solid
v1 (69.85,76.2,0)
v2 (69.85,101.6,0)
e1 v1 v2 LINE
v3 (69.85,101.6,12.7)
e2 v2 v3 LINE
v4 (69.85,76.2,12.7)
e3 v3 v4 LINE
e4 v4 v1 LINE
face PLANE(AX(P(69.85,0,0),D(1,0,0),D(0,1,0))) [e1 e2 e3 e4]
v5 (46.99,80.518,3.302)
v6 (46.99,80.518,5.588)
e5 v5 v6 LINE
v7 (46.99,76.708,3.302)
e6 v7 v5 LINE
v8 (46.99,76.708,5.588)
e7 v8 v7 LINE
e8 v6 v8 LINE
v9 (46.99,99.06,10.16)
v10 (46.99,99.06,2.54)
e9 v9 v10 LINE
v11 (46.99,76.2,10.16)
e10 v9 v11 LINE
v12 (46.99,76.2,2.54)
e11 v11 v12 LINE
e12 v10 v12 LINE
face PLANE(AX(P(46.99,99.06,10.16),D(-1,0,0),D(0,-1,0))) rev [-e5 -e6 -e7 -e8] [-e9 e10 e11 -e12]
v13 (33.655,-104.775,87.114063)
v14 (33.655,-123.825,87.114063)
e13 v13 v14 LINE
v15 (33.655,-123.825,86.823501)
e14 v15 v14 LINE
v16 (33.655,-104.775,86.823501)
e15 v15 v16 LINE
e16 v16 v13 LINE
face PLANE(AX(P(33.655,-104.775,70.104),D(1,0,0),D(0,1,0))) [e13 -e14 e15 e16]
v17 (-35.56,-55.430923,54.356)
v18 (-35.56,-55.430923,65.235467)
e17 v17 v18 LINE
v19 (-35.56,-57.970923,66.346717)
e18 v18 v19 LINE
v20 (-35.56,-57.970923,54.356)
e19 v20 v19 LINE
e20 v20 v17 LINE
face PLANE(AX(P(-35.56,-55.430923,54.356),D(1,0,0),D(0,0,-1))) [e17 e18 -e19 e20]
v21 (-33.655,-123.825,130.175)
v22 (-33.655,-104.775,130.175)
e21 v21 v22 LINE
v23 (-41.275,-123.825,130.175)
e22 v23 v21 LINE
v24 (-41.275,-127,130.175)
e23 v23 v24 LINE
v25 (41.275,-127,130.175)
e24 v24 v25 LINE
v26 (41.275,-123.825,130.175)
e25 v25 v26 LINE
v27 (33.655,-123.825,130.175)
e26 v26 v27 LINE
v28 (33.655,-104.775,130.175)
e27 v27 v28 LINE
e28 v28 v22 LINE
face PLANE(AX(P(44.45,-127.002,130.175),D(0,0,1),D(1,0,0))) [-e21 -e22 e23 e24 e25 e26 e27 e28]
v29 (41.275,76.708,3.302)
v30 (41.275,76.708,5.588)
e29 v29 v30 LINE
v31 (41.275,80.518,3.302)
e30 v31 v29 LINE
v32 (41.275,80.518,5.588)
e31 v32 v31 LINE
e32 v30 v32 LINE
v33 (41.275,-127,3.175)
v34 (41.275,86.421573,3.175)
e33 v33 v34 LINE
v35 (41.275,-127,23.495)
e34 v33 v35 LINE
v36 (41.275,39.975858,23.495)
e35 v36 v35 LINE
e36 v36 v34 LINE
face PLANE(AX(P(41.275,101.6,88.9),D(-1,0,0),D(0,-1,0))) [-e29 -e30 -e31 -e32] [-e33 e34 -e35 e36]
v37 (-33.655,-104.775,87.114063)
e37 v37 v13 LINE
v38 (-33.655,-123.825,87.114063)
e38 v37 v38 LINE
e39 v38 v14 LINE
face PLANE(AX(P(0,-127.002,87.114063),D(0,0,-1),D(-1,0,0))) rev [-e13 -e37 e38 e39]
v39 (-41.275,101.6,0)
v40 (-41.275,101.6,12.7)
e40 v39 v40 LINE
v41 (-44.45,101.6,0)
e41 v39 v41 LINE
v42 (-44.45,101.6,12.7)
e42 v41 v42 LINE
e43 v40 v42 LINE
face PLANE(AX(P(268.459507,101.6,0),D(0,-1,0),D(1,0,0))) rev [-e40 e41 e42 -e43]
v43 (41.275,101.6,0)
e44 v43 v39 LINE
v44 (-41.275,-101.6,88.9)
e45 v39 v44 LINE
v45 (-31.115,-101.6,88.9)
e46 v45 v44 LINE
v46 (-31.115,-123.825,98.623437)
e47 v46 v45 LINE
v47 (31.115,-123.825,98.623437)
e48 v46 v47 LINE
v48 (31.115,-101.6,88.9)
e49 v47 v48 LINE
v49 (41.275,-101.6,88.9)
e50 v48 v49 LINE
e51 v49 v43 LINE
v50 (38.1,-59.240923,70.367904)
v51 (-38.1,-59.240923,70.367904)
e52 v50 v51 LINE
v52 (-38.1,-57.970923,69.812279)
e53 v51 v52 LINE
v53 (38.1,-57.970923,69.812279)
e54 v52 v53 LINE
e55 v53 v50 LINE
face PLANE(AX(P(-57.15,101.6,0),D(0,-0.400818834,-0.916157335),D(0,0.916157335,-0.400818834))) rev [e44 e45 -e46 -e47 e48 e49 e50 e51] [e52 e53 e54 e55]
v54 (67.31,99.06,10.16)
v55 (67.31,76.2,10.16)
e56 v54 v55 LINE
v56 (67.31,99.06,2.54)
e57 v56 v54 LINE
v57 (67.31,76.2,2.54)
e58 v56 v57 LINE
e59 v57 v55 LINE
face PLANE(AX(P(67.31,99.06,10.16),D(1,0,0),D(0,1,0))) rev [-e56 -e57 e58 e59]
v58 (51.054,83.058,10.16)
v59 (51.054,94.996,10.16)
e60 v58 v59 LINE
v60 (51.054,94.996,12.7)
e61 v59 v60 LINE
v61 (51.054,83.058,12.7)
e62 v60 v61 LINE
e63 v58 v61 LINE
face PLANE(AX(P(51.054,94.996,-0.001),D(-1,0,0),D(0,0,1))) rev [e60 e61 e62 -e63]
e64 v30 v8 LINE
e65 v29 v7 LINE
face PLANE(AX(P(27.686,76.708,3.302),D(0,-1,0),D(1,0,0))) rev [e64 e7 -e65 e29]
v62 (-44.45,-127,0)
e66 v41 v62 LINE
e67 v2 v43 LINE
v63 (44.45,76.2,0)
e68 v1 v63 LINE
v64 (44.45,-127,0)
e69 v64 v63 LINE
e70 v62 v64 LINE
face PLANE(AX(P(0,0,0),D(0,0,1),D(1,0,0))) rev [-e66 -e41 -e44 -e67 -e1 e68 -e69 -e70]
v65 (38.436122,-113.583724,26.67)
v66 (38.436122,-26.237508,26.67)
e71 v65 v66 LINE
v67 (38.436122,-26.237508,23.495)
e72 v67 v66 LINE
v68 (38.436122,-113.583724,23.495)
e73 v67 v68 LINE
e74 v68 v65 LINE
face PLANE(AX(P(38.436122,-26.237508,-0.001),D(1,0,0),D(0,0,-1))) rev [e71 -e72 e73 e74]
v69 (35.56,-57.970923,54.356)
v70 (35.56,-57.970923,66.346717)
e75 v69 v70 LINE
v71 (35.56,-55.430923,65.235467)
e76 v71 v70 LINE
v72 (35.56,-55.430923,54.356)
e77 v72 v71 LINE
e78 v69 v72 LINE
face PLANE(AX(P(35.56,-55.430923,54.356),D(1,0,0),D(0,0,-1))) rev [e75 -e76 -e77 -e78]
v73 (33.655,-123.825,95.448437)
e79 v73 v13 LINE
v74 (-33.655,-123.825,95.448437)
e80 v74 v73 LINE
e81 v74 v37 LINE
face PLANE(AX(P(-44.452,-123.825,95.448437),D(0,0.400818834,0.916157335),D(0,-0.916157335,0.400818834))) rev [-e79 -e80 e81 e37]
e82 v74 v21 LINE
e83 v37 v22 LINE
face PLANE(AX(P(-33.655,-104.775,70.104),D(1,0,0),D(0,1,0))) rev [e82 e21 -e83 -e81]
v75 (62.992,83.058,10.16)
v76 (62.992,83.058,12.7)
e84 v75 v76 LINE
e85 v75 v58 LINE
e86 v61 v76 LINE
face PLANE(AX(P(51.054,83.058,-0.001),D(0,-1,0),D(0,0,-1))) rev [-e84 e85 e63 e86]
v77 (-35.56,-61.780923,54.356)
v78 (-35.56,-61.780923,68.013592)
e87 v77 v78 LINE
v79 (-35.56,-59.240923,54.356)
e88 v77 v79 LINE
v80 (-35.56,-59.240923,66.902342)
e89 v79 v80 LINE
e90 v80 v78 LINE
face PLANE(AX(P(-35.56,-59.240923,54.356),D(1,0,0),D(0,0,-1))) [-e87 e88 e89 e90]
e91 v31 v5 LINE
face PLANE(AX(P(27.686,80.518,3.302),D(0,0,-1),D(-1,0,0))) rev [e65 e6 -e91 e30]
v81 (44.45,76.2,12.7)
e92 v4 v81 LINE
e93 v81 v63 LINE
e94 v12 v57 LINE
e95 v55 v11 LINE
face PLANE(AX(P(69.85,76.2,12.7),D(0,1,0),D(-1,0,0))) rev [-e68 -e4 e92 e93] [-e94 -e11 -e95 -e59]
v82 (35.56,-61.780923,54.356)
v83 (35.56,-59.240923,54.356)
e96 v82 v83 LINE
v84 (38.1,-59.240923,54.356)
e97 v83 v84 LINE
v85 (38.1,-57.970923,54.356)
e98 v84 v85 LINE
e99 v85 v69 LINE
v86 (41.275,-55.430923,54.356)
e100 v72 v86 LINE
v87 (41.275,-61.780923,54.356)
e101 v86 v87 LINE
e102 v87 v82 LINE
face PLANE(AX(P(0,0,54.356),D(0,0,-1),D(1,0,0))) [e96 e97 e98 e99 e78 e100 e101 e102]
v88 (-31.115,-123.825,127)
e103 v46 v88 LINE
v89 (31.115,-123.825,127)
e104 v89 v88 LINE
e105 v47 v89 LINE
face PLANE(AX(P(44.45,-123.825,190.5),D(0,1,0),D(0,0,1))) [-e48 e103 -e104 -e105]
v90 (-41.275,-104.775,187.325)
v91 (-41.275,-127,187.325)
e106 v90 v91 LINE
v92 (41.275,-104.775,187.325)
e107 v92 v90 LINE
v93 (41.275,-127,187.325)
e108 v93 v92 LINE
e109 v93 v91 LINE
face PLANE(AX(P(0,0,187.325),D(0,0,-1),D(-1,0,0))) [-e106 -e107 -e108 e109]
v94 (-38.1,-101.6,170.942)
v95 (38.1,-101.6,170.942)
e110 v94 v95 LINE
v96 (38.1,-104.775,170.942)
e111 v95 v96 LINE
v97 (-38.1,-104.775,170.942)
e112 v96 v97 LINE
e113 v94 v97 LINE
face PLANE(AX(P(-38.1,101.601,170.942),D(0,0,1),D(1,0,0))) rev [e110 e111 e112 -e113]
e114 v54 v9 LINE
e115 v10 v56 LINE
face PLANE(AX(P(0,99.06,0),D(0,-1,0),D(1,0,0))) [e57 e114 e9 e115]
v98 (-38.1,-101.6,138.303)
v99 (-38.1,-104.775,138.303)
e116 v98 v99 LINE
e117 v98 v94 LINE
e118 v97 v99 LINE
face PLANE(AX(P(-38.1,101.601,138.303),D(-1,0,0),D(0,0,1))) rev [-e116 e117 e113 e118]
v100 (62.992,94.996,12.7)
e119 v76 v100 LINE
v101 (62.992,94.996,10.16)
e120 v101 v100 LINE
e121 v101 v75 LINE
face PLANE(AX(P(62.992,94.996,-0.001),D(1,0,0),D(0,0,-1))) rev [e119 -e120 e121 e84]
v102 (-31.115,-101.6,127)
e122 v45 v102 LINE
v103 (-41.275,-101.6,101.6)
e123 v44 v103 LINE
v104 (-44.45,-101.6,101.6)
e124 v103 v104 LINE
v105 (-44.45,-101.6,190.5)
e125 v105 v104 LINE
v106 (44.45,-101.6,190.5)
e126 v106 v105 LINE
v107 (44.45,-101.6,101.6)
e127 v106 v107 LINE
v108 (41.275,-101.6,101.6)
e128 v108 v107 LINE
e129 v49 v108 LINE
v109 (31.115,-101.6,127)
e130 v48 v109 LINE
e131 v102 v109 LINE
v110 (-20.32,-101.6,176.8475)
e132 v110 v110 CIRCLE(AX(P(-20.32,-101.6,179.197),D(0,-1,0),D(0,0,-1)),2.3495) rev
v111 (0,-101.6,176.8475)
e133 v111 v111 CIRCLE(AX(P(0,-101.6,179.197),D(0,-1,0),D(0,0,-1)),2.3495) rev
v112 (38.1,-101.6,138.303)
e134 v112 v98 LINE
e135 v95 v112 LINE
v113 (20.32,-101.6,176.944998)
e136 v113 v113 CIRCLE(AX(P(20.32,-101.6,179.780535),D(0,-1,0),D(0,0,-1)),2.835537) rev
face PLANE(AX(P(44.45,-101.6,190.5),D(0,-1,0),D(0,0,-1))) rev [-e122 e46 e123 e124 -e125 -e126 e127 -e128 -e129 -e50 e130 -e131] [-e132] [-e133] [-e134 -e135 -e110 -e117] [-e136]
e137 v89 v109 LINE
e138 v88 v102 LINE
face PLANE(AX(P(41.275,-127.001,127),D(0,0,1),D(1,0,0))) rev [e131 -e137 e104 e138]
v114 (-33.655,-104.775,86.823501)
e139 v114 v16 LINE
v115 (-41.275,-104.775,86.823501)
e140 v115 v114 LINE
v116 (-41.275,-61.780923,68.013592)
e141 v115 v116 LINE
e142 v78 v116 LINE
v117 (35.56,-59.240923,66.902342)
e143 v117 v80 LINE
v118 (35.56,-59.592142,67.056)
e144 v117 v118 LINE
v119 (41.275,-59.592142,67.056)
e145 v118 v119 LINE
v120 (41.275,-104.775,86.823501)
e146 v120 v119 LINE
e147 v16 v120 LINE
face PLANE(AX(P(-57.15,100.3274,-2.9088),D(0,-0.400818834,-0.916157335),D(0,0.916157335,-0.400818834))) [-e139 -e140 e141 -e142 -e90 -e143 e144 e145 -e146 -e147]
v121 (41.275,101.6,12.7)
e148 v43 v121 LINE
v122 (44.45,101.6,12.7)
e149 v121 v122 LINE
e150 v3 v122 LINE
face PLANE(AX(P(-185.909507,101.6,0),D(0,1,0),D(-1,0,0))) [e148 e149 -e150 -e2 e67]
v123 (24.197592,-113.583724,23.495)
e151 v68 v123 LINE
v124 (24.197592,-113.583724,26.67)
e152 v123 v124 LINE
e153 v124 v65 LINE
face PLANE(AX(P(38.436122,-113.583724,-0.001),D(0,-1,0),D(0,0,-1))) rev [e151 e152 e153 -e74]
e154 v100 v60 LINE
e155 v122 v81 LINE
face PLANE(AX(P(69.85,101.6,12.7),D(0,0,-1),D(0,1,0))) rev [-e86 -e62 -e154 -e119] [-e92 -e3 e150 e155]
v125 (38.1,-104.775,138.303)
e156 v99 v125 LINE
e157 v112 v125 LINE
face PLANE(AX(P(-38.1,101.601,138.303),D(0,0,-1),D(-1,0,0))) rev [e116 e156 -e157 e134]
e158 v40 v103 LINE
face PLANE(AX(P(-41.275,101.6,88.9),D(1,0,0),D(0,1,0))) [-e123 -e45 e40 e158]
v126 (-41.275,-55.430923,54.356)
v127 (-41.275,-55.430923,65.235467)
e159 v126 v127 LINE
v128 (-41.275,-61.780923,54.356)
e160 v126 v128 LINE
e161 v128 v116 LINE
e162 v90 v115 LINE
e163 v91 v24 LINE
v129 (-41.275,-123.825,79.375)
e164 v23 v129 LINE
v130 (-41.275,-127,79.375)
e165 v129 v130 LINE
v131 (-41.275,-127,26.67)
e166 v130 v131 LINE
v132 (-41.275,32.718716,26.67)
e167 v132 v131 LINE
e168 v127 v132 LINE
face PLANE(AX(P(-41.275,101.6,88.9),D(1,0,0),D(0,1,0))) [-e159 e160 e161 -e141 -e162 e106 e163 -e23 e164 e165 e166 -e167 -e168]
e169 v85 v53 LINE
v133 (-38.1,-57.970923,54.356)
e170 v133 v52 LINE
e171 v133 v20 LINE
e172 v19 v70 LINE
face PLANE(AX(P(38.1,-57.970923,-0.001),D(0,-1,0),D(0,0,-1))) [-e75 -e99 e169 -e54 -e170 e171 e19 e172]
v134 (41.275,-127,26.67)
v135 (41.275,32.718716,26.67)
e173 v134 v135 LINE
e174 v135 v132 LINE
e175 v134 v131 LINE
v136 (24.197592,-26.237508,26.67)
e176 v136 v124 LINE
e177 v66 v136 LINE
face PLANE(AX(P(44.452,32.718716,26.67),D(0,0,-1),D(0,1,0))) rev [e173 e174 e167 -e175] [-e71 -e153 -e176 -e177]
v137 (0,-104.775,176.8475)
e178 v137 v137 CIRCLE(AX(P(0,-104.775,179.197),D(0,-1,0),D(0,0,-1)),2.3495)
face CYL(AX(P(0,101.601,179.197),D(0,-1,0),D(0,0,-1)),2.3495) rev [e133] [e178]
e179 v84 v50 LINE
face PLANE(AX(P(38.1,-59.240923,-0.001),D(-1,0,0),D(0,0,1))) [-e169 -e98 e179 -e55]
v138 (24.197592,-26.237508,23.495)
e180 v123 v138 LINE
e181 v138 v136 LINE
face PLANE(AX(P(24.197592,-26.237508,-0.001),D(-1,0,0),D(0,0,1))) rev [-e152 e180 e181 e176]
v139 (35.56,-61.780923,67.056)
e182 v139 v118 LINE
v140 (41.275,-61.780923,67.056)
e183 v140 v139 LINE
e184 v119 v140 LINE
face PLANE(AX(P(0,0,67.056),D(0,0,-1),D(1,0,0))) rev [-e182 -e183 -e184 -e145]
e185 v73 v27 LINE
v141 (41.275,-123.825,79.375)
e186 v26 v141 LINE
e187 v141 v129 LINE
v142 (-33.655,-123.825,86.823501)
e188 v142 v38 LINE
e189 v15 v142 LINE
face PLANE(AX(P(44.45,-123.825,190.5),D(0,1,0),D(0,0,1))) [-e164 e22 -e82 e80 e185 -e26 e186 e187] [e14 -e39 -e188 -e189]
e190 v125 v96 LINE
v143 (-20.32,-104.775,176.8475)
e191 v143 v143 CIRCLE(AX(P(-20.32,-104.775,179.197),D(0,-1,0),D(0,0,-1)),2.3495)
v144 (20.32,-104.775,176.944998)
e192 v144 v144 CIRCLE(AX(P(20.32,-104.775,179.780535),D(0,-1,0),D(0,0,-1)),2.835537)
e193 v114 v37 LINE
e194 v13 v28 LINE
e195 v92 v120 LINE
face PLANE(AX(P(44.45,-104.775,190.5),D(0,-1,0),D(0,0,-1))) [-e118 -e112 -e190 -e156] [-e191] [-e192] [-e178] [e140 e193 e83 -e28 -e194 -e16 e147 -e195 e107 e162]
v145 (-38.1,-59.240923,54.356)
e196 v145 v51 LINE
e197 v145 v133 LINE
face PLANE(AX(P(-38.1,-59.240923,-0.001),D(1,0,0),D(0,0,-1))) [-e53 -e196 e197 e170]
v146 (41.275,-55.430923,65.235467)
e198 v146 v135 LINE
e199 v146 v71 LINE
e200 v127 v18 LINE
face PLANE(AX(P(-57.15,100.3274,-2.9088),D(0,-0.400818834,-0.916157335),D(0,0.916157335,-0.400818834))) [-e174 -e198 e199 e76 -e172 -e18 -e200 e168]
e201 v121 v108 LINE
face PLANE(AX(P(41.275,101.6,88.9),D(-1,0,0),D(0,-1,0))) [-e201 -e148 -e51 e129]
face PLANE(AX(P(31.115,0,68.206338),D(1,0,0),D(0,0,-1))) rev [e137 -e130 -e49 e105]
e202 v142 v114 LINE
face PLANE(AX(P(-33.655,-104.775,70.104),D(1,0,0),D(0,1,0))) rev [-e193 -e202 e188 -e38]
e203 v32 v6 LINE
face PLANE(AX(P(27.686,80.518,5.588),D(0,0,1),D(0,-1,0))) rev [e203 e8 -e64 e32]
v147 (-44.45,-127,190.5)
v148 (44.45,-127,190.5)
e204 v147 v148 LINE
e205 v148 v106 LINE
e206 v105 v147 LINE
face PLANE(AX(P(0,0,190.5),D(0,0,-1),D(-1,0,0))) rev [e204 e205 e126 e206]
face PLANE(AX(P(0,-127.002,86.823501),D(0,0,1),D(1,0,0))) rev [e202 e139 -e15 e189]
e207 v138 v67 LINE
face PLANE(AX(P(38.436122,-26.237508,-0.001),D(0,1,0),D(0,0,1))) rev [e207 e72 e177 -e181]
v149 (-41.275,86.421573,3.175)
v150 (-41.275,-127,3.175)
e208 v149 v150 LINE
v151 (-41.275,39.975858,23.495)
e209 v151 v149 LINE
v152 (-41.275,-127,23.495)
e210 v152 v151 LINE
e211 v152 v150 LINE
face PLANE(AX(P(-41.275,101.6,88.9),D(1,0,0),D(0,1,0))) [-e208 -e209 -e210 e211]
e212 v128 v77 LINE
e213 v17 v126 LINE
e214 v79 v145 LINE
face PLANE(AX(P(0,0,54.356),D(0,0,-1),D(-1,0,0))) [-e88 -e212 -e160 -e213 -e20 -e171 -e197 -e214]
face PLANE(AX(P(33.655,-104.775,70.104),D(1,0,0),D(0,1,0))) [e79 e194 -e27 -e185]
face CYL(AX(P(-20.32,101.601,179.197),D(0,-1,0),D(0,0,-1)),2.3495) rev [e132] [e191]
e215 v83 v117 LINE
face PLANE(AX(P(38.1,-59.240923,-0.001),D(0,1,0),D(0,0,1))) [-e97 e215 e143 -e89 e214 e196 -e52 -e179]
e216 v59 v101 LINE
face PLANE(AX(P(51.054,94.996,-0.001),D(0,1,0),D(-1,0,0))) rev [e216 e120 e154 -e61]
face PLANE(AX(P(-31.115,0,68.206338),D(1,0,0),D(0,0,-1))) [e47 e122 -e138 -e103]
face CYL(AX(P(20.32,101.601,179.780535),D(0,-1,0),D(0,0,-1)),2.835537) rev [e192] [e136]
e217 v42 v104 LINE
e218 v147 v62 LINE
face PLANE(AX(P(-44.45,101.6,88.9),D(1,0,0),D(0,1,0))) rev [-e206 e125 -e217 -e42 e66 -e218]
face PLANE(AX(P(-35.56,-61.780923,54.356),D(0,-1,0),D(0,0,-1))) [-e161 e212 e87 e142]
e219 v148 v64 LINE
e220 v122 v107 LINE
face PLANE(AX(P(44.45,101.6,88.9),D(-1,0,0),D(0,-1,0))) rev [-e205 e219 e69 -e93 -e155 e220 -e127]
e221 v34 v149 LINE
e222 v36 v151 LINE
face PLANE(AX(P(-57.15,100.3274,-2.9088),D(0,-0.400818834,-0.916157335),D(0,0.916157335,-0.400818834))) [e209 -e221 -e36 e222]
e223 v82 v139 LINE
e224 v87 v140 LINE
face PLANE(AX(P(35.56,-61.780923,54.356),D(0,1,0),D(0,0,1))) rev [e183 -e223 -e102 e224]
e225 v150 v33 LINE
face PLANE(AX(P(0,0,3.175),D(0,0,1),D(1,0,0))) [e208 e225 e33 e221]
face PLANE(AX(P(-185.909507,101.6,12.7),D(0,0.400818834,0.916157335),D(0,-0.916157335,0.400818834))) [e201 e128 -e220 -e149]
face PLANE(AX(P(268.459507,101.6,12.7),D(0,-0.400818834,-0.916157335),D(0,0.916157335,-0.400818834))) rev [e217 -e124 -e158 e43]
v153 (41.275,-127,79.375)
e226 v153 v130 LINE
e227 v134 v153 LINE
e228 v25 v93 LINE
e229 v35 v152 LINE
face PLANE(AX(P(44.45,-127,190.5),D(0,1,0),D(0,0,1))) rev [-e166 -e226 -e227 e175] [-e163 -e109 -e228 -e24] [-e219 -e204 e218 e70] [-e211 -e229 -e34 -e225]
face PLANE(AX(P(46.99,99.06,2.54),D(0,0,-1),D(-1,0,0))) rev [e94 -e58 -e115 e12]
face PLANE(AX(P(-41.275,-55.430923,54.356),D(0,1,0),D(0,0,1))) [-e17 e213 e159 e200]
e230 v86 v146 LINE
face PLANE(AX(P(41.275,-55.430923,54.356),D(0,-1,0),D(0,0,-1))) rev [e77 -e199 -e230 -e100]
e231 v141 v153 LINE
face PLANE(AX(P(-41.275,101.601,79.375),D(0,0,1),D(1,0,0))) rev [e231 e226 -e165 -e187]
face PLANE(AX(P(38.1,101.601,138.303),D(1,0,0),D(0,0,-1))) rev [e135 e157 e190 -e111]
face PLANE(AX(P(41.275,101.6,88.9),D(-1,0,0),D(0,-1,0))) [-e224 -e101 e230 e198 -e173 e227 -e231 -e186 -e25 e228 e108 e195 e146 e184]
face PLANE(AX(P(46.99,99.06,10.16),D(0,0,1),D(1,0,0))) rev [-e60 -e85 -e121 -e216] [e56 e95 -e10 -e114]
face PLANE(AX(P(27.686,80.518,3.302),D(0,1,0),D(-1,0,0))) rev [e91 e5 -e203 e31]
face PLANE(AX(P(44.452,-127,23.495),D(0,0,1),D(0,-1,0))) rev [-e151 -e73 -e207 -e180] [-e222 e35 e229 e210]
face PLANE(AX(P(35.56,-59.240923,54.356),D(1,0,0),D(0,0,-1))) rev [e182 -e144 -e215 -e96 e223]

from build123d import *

# Parameters (mm, degrees)
SKETCH3_W                       = 88.9
SKETCH3_H                       = 203.2
BOSS_EXTRUDE2_DEPTH             = 88.9
CUT_EXTRUDE1_DEPTH              = 101.6
SHELL2_T                        = -3.175
SKETCH5_W                       = 88.9
SKETCH5_H                       = 25.4
BOSS_EXTRUDE3_DEPTH             = 190.5
SHELL4_START                    = -41.275
SHELL4_DEPTH                    = 82.55
CUT_EXTRUDE2_REACH              = 284.057
SKETCH7_W                       = 82.55
SKETCH7_H                       = 38.1
BOSS_EXTRUDE4_REACH             = 246.475
BOSS_EXTRUDE5_REACH             = 284.057
SKETCH10_W                      = 88.9
SKETCH10_H                      = 3.175
CUT_EXTRUDE7_REACH              = 302.872
SKETCH13_W                      = 82.55
SKETCH13_H                      = 57.15
BOSS_EXTRUDE6_START             = -3.175
BOSS_EXTRUDE6_DEPTH             = 3.175
BOSS_EXTRUDE7_REACH             = 284.057
SKETCH16_W                      = 82.55
SKETCH16_H                      = 3.175
CUT_EXTRUDE8_REACH              = 302.872
SKETCH17_W                      = 82.55
SKETCH17_H                      = 76.2
BOSS_EXTRUDE8_REACH             = 286.353
SKETCH18_W                      = 82.548541704
SKETCH18_H                      = 0.29056195
BOSS_EXTRUDE9_REACH             = 246.475
CUT_EXTRUDE9_REACH              = 173.426
SKETCH23_W                      = 76.2
SKETCH23_H                      = 1.27
BOSS_EXTRUDE10_DEPTH            = 12.7
BOSS_EXTRUDE11_REACH            = 184.601
SKETCH25_W                      = 5.715
SKETCH25_H                      = 2.188780981
SKETCH26_W                      = 12.7
SKETCH26_H                      = 25.4
BOSS_EXTRUDE12_DEPTH            = 25.4
SKETCH27_W                      = 20.32
SKETCH27_H                      = 7.62
CUT_EXTRUDE10_DEPTH             = 22.86
SKETCH29_W                      = 2.286
SKETCH29_H                      = 3.81
CUT_EXTRUDE12_DEPTH             = 19.304
CUT_EXTRUDE13_REACH             = 231.392
SKETCH30_W                      = 11.938
SKETCH30_H                      = 11.938
CUT_EXTRUDE14_REACH             = 220.743
SKETCH31_W                      = 14.238530822
SKETCH31_H                      = 87.346215886
CUT_EXTRUDE16_REACH             = 194.71
SKETCH32_W                      = 7.62
SKETCH32_H                      = 19.05
CUT_EXTRUDE16_DIRECTION_2_DEPTH = 56.896
BOSS_EXTRUDE13_REACH            = 194.71
CUT_EXTRUDE17_REACH             = 291.413
SKETCH34_W                      = 76.2
SKETCH34_H                      = 32.639
CUT_EXTRUDE18_REACH             = 291.413
SKETCH35_R                      = 2.3495
SKETCH35_R_2                    = 2.83553705


# Read off the part's stored shape, not the designer's step: Shell4
with BuildPart() as part:
    # Sketch3 → Boss-Extrude2 (new body)
    with BuildSketch(Plane.XY):
        Rectangle(SKETCH3_W, SKETCH3_H)
    extrude(amount=BOSS_EXTRUDE2_DEPTH)

    # Sketch4 → Cut-Extrude1 (cut)
    with BuildSketch(Plane(origin=(44.45, 0, 0), x_dir=(0, 0, -1), z_dir=(1, 0, 0))):
        Polygon((0, 101.6), (-88.9, -101.6), (-88.9, 101.6), align=None)
    extrude(amount=-CUT_EXTRUDE1_DEPTH, mode=Mode.SUBTRACT)

    # Shell2
    shell2_openings = [part.faces().sort_by_distance(p)[0] for p in [
        (0, 0, 0),
        (0, -101.6, 44.45),
    ]]
    offset(amount=SHELL2_T, openings=shell2_openings, kind=Kind.INTERSECTION)

    # Sketch5 → Boss-Extrude3 (add)
    with BuildSketch(Plane.XY):
        with Locations((0, -114.3)):
            Rectangle(SKETCH5_W, SKETCH5_H)
    extrude(amount=BOSS_EXTRUDE3_DEPTH)

    # Shell4 outline → Shell4 (cut)
    with BuildSketch(Plane.YZ.offset(SHELL4_START)):
        Polygon((-123.825, 3.175), (-101.6, 3.175), (-101.6, 85.43443805), (-104.775, 86.82350055), (-104.775, 187.325), (-123.825, 187.325), align=None)
    extrude(amount=SHELL4_DEPTH, mode=Mode.SUBTRACT)

    # Sketch7 → Cut-Extrude2 (cut, up to next)
    with BuildSketch(Plane(origin=(0, -101.6, 0), x_dir=(1, 0, 0), z_dir=(0, 1, 0)), mode=Mode.PRIVATE) as cut_extrude2_sk1:
        with Locations((0, -107.95)):
            Rectangle(SKETCH7_W, SKETCH7_H)
    cut_extrude2_tool1 = extrude(cut_extrude2_sk1.sketch, amount=-CUT_EXTRUDE2_REACH, mode=Mode.PRIVATE) & part.part
    add(cut_extrude2_tool1.solids().sort_by_distance((0, -101.6, 107.95))[0], mode=Mode.SUBTRACT)

    # Sketch9 → Boss-Extrude4 (add, up to next)
    with BuildSketch(Plane.ZY.offset(-41.275), mode=Mode.PRIVATE) as boss_extrude4_sk1:
        Polygon((88.9, -101.6), (98.6234375, -123.825), (95.4484375, -123.825), (85.725, -101.6), align=None)
    boss_extrude4_tool1 = extrude(boss_extrude4_sk1.sketch, amount=BOSS_EXTRUDE4_REACH, mode=Mode.PRIVATE) - part.part
    add(boss_extrude4_tool1.solids().sort_by_distance((41.275, -112.7125, 92.174219))[0])

    # Sketch10 → Boss-Extrude5 (add, up to next)
    with BuildSketch(Plane(origin=(0, -101.6, 0), x_dir=(1, 0, 0), z_dir=(0, 1, 0)), mode=Mode.PRIVATE) as boss_extrude5_sk1:
        with Locations((0, -128.5875)):
            Rectangle(SKETCH10_W, SKETCH10_H)
    boss_extrude5_tool1 = extrude(boss_extrude5_sk1.sketch, amount=-BOSS_EXTRUDE5_REACH, mode=Mode.PRIVATE) - part.part
    add(boss_extrude5_tool1.solids().sort_by_distance((0, -101.6, 128.5875))[0])

    # Sketch13 → Cut-Extrude7 (cut, up to next)
    with BuildSketch(Plane.XZ.offset(127), mode=Mode.PRIVATE) as cut_extrude7_sk1:
        with Locations((0, 158.75)):
            Rectangle(SKETCH13_W, SKETCH13_H)
    cut_extrude7_tool1 = extrude(cut_extrude7_sk1.sketch, amount=-CUT_EXTRUDE7_REACH, mode=Mode.PRIVATE) & part.part
    add(cut_extrude7_tool1.solids().sort_by_distance((0, -127, 158.75))[0], mode=Mode.SUBTRACT)

    # Sketch14 → Boss-Extrude6 (add)
    with BuildSketch(Plane(origin=(44.45, 0, 0), x_dir=(0, 0, -1), z_dir=(1, 0, 0)).offset(BOSS_EXTRUDE6_START)):
        Polygon((0, 101.6), (-12.7, 101.6), (-101.6, -101.6), (-88.9, -101.6), align=None)
    boss_extrude6 = extrude(amount=BOSS_EXTRUDE6_DEPTH)

    # Mirror1: Boss-Extrude6 across plane
    add(boss_extrude6.mirror(Plane(origin=(0, 0, 0), x_dir=(0, 0, 1), z_dir=(1, 0, 0))))

    # Sketch16 → Boss-Extrude7 (add, up to next)
    with BuildSketch(Plane(origin=(0, -101.6, 0), x_dir=(1, 0, 0), z_dir=(0, 1, 0)), mode=Mode.PRIVATE) as boss_extrude7_sk1:
        with Locations((0, -1.5875)):
            Rectangle(SKETCH16_W, SKETCH16_H)
    boss_extrude7_tool1 = extrude(boss_extrude7_sk1.sketch, amount=BOSS_EXTRUDE7_REACH, mode=Mode.PRIVATE) - part.part
    add(boss_extrude7_tool1.solids().sort_by_distance((0, -101.6, 1.5875))[0])

    # Sketch17 → Cut-Extrude8 (cut, up to next)
    with BuildSketch(Plane.XZ.offset(127), mode=Mode.PRIVATE) as cut_extrude8_sk1:
        with Locations((0, 41.275)):
            Rectangle(SKETCH17_W, SKETCH17_H)
    cut_extrude8_tool1 = extrude(cut_extrude8_sk1.sketch, amount=-CUT_EXTRUDE8_REACH, mode=Mode.PRIVATE) & part.part
    add(cut_extrude8_tool1.solids().sort_by_distance((0, -127, 41.275))[0], mode=Mode.SUBTRACT)

    # Sketch18 → Boss-Extrude8 (add, up to next)
    with BuildSketch(Plane.XZ.offset(104.775), mode=Mode.PRIVATE) as boss_extrude8_sk1:
        with Locations((-0.000729148, 86.968781525)):
            Rectangle(SKETCH18_W, SKETCH18_H)
    boss_extrude8_tool1 = extrude(boss_extrude8_sk1.sketch, amount=BOSS_EXTRUDE8_REACH, mode=Mode.PRIVATE) - part.part
    add(boss_extrude8_tool1.solids().sort_by_distance((-0.000729, -104.775, 86.968782))[0])

    # Sketch19 → Boss-Extrude9 (add, up to next)
    with BuildSketch(Plane(origin=(-41.275, 0, 0), x_dir=(0, 0, -1), z_dir=(1, 0, 0)), mode=Mode.PRIVATE) as boss_extrude9_sk1:
        Polygon((-26.67, -127), (-23.495, -127), (-23.495, 39.9758584), (-26.67, 32.718715543), align=None)
    boss_extrude9_tool1 = extrude(boss_extrude9_sk1.sketch, amount=BOSS_EXTRUDE9_REACH, mode=Mode.PRIVATE) - part.part
    add(boss_extrude9_tool1.solids().sort_by_distance((-41.275, -45.312922, 25.070745))[0])

    # Cut-Extrude9: up to this plane
    cut_extrude9_end = Plane(origin=(-57.15, 100.327400202, -2.908799538), z_dir=(0, -0.40081883401970775, -0.9161573349021892))
    # Sketch23 → Cut-Extrude9 (cut, up to the surface)
    with BuildSketch(Plane(origin=(0, 0, 84.28350055), x_dir=(-1, 0, 0), z_dir=(0, 0, -1)), mode=Mode.PRIVATE) as cut_extrude9_sk1:
        with Locations((0, -58.605922581)):
            Rectangle(SKETCH23_W, SKETCH23_H)
    cut_extrude9_tool1 = split(extrude(cut_extrude9_sk1.sketch, amount=CUT_EXTRUDE9_REACH, mode=Mode.PRIVATE), bisect_by=cut_extrude9_end, keep=Keep.BOTH, mode=Mode.PRIVATE)
    add(cut_extrude9_tool1.solids().sort_by_distance((0, -58.605923, 84.283501))[0], mode=Mode.SUBTRACT)

    # Sketch24 → Boss-Extrude10 (add)
    with BuildSketch(Plane.XY.offset(67.056)):
        Polygon((-35.56, -59.240922581), (-35.56, -61.780922581), (-41.275, -61.780922581), (-41.275, -55.430922581), (-35.56, -55.430922581), (-35.56, -57.970922581), (-38.1, -57.970922581), (-38.1, -59.240922581), align=None)
    boss_extrude10 = extrude(amount=-BOSS_EXTRUDE10_DEPTH)

    # Sketch25 → Boss-Extrude11 (add, up to next)
    with BuildSketch(Plane.XY.offset(67.056), mode=Mode.PRIVATE) as boss_extrude11_sk1:
        with Locations((-38.4175, -60.686532091)):
            Rectangle(SKETCH25_W, SKETCH25_H)
    boss_extrude11_tool1 = extrude(boss_extrude11_sk1.sketch, amount=BOSS_EXTRUDE11_REACH, mode=Mode.PRIVATE) - part.part
    add(boss_extrude11_tool1.solids().sort_by_distance((-38.4175, -60.686532, 67.056))[0])

    # Mirror2: Boss-Extrude10 across plane
    add(boss_extrude10.mirror(Plane(origin=(0, 0, 0), x_dir=(0, 0, 1), z_dir=(1, 0, 0))))

    # Sketch26 → Boss-Extrude12 (add)
    with BuildSketch(Plane(origin=(44.45, 0, 0), x_dir=(0, 0, -1), z_dir=(1, 0, 0))):
        with Locations((-6.35, 88.9)):
            Rectangle(SKETCH26_W, SKETCH26_H)
    extrude(amount=BOSS_EXTRUDE12_DEPTH)

    # Sketch27 → Cut-Extrude10 (cut)
    with BuildSketch(Plane.XZ.offset(-76.2)):
        with Locations((57.15, 6.35)):
            Rectangle(SKETCH27_W, SKETCH27_H)
    extrude(amount=-CUT_EXTRUDE10_DEPTH, mode=Mode.SUBTRACT)

    # Sketch29 → Cut-Extrude12 (cut)
    with BuildSketch(Plane(origin=(46.99, 0, 0), x_dir=(0, 0, -1), z_dir=(1, 0, 0))):
        with Locations((-4.445, 78.613)):
            Rectangle(SKETCH29_W, SKETCH29_H)
    extrude(amount=-CUT_EXTRUDE12_DEPTH, mode=Mode.SUBTRACT)

    # Sketch30 → Cut-Extrude13 (cut, up to next)
    with BuildSketch(Plane.XY.offset(12.7), mode=Mode.PRIVATE) as cut_extrude13_sk1:
        with Locations((57.023, 89.027)):
            Rectangle(SKETCH30_W, SKETCH30_H)
    cut_extrude13_tool1 = extrude(cut_extrude13_sk1.sketch, amount=-CUT_EXTRUDE13_REACH, mode=Mode.PRIVATE) & part.part
    add(cut_extrude13_tool1.solids().sort_by_distance((57.023, 89.027, 12.7))[0], mode=Mode.SUBTRACT)

    # Sketch31 → Cut-Extrude14 (cut, up to next)
    with BuildSketch(Plane.XY.offset(26.67), mode=Mode.PRIVATE) as cut_extrude14_sk1:
        with Locations((31.316857017, -69.910616217)):
            Rectangle(SKETCH31_W, SKETCH31_H)
    cut_extrude14_tool1 = extrude(cut_extrude14_sk1.sketch, amount=-CUT_EXTRUDE14_REACH, mode=Mode.PRIVATE) & part.part
    add(cut_extrude14_tool1.solids().sort_by_distance((31.316857, -69.910616, 26.67))[0], mode=Mode.SUBTRACT)

    # Sketch32 → Cut-Extrude16 (cut, up to next)
    with BuildSketch(Plane(origin=(0, 0, 127), x_dir=(-1, 0, 0), z_dir=(0, 0, -1)), mode=Mode.PRIVATE) as cut_extrude16_sk1:
        with Locations((-37.465, -114.3)):
            Rectangle(SKETCH32_W, SKETCH32_H)
    cut_extrude16_tool1 = extrude(cut_extrude16_sk1.sketch, amount=-CUT_EXTRUDE16_REACH, mode=Mode.PRIVATE) & part.part
    cut_extrude16 = cut_extrude16_tool1.solids().sort_by_distance((37.465, -114.3, 127))[0]
    add(cut_extrude16, mode=Mode.SUBTRACT)

    # Sketch32 → Cut-Extrude16 direction 2 (cut)
    with BuildSketch(Plane(origin=(0, 0, 127), x_dir=(-1, 0, 0), z_dir=(0, 0, -1))):
        with Locations((-37.465, -114.3)):
            Rectangle(SKETCH32_W, SKETCH32_H)
    cut_extrude16_direction_2 = extrude(amount=CUT_EXTRUDE16_DIRECTION_2_DEPTH, mode=Mode.SUBTRACT)

    # Mirror5: Cut-Extrude16, Cut-Extrude16 direction 2 across plane
    add(cut_extrude16.mirror(Plane(origin=(0, 0, 0), x_dir=(0, 0, 1), z_dir=(1, 0, 0))), mode=Mode.SUBTRACT)
    add(cut_extrude16_direction_2.mirror(Plane(origin=(0, 0, 0), x_dir=(0, 0, 1), z_dir=(1, 0, 0))), mode=Mode.SUBTRACT)

    # Boss-Extrude13: up to this plane
    boss_extrude13_end = Plane(origin=(-57.15, 101.6, 0), z_dir=(0, -0.40081883401970775, -0.9161573349021892))
    # Sketch33 → Boss-Extrude13 (add, up to the surface)
    with BuildSketch(Plane(origin=(0, 0, 127), x_dir=(-1, 0, 0), z_dir=(0, 0, -1)), mode=Mode.PRIVATE) as boss_extrude13_sk1:
        Polygon((-31.115, -101.6), (-41.275, -101.6), (-41.275, -104.775), (-33.655, -104.775), (-33.655, -123.825), (-31.115, -123.825), align=None)
    boss_extrude13_tool1 = split(extrude(boss_extrude13_sk1.sketch, amount=BOSS_EXTRUDE13_REACH, mode=Mode.PRIVATE), bisect_by=boss_extrude13_end, keep=Keep.BOTH, mode=Mode.PRIVATE)
    boss_extrude13 = boss_extrude13_tool1.solids().sort_by_distance((36.195, -101.844372, 127))[0]
    add(boss_extrude13)

    # Mirror6: Boss-Extrude13 across plane
    add(boss_extrude13.mirror(Plane(origin=(0, 0, 0), x_dir=(0, 0, 1), z_dir=(1, 0, 0))))

    # Sketch34 → Cut-Extrude17 (cut, up to next)
    with BuildSketch(Plane.XZ.offset(104.775), mode=Mode.PRIVATE) as cut_extrude17_sk1:
        with Locations((0, 154.6225)):
            Rectangle(SKETCH34_W, SKETCH34_H)
    cut_extrude17_tool1 = extrude(cut_extrude17_sk1.sketch, amount=-CUT_EXTRUDE17_REACH, mode=Mode.PRIVATE) & part.part
    add(cut_extrude17_tool1.solids().sort_by_distance((0, -104.775, 154.6225))[0], mode=Mode.SUBTRACT)

    # Sketch35 → Cut-Extrude18 (cut, up to next)
    with BuildSketch(Plane.XZ.offset(104.775), mode=Mode.PRIVATE) as cut_extrude18_sk1:
        with Locations(Location((0, 179.197, 0), (0, 0, 270))):
            Circle(SKETCH35_R)
    cut_extrude18_tool1 = extrude(cut_extrude18_sk1.sketch, amount=-CUT_EXTRUDE18_REACH, mode=Mode.PRIVATE) & part.part
    # Sketch35 → Cut-Extrude18 (cut, up to next)
    with BuildSketch(Plane.XZ.offset(104.775), mode=Mode.PRIVATE) as cut_extrude18_sk2:
        with Locations(Location((20.32, 179.780535398, 0), (0, 0, 270))):
            Circle(SKETCH35_R_2)
    cut_extrude18_tool2 = extrude(cut_extrude18_sk2.sketch, amount=-CUT_EXTRUDE18_REACH, mode=Mode.PRIVATE) & part.part
    # Sketch35 → Cut-Extrude18 (cut, up to next)
    with BuildSketch(Plane.XZ.offset(104.775), mode=Mode.PRIVATE) as cut_extrude18_sk3:
        with Locations(Location((-20.32, 179.197, 0), (0, 0, 270))):
            Circle(SKETCH35_R)
    cut_extrude18_tool3 = extrude(cut_extrude18_sk3.sketch, amount=-CUT_EXTRUDE18_REACH, mode=Mode.PRIVATE) & part.part
    add(cut_extrude18_tool1.solids().sort_by_distance((0, -104.775, 179.197))[0], mode=Mode.SUBTRACT)
    add(cut_extrude18_tool2.solids().sort_by_distance((20.32, -104.775, 179.780535))[0], mode=Mode.SUBTRACT)
    add(cut_extrude18_tool3.solids().sort_by_distance((-20.32, -104.775, 179.197))[0], mode=Mode.SUBTRACT)


solid = part.part
